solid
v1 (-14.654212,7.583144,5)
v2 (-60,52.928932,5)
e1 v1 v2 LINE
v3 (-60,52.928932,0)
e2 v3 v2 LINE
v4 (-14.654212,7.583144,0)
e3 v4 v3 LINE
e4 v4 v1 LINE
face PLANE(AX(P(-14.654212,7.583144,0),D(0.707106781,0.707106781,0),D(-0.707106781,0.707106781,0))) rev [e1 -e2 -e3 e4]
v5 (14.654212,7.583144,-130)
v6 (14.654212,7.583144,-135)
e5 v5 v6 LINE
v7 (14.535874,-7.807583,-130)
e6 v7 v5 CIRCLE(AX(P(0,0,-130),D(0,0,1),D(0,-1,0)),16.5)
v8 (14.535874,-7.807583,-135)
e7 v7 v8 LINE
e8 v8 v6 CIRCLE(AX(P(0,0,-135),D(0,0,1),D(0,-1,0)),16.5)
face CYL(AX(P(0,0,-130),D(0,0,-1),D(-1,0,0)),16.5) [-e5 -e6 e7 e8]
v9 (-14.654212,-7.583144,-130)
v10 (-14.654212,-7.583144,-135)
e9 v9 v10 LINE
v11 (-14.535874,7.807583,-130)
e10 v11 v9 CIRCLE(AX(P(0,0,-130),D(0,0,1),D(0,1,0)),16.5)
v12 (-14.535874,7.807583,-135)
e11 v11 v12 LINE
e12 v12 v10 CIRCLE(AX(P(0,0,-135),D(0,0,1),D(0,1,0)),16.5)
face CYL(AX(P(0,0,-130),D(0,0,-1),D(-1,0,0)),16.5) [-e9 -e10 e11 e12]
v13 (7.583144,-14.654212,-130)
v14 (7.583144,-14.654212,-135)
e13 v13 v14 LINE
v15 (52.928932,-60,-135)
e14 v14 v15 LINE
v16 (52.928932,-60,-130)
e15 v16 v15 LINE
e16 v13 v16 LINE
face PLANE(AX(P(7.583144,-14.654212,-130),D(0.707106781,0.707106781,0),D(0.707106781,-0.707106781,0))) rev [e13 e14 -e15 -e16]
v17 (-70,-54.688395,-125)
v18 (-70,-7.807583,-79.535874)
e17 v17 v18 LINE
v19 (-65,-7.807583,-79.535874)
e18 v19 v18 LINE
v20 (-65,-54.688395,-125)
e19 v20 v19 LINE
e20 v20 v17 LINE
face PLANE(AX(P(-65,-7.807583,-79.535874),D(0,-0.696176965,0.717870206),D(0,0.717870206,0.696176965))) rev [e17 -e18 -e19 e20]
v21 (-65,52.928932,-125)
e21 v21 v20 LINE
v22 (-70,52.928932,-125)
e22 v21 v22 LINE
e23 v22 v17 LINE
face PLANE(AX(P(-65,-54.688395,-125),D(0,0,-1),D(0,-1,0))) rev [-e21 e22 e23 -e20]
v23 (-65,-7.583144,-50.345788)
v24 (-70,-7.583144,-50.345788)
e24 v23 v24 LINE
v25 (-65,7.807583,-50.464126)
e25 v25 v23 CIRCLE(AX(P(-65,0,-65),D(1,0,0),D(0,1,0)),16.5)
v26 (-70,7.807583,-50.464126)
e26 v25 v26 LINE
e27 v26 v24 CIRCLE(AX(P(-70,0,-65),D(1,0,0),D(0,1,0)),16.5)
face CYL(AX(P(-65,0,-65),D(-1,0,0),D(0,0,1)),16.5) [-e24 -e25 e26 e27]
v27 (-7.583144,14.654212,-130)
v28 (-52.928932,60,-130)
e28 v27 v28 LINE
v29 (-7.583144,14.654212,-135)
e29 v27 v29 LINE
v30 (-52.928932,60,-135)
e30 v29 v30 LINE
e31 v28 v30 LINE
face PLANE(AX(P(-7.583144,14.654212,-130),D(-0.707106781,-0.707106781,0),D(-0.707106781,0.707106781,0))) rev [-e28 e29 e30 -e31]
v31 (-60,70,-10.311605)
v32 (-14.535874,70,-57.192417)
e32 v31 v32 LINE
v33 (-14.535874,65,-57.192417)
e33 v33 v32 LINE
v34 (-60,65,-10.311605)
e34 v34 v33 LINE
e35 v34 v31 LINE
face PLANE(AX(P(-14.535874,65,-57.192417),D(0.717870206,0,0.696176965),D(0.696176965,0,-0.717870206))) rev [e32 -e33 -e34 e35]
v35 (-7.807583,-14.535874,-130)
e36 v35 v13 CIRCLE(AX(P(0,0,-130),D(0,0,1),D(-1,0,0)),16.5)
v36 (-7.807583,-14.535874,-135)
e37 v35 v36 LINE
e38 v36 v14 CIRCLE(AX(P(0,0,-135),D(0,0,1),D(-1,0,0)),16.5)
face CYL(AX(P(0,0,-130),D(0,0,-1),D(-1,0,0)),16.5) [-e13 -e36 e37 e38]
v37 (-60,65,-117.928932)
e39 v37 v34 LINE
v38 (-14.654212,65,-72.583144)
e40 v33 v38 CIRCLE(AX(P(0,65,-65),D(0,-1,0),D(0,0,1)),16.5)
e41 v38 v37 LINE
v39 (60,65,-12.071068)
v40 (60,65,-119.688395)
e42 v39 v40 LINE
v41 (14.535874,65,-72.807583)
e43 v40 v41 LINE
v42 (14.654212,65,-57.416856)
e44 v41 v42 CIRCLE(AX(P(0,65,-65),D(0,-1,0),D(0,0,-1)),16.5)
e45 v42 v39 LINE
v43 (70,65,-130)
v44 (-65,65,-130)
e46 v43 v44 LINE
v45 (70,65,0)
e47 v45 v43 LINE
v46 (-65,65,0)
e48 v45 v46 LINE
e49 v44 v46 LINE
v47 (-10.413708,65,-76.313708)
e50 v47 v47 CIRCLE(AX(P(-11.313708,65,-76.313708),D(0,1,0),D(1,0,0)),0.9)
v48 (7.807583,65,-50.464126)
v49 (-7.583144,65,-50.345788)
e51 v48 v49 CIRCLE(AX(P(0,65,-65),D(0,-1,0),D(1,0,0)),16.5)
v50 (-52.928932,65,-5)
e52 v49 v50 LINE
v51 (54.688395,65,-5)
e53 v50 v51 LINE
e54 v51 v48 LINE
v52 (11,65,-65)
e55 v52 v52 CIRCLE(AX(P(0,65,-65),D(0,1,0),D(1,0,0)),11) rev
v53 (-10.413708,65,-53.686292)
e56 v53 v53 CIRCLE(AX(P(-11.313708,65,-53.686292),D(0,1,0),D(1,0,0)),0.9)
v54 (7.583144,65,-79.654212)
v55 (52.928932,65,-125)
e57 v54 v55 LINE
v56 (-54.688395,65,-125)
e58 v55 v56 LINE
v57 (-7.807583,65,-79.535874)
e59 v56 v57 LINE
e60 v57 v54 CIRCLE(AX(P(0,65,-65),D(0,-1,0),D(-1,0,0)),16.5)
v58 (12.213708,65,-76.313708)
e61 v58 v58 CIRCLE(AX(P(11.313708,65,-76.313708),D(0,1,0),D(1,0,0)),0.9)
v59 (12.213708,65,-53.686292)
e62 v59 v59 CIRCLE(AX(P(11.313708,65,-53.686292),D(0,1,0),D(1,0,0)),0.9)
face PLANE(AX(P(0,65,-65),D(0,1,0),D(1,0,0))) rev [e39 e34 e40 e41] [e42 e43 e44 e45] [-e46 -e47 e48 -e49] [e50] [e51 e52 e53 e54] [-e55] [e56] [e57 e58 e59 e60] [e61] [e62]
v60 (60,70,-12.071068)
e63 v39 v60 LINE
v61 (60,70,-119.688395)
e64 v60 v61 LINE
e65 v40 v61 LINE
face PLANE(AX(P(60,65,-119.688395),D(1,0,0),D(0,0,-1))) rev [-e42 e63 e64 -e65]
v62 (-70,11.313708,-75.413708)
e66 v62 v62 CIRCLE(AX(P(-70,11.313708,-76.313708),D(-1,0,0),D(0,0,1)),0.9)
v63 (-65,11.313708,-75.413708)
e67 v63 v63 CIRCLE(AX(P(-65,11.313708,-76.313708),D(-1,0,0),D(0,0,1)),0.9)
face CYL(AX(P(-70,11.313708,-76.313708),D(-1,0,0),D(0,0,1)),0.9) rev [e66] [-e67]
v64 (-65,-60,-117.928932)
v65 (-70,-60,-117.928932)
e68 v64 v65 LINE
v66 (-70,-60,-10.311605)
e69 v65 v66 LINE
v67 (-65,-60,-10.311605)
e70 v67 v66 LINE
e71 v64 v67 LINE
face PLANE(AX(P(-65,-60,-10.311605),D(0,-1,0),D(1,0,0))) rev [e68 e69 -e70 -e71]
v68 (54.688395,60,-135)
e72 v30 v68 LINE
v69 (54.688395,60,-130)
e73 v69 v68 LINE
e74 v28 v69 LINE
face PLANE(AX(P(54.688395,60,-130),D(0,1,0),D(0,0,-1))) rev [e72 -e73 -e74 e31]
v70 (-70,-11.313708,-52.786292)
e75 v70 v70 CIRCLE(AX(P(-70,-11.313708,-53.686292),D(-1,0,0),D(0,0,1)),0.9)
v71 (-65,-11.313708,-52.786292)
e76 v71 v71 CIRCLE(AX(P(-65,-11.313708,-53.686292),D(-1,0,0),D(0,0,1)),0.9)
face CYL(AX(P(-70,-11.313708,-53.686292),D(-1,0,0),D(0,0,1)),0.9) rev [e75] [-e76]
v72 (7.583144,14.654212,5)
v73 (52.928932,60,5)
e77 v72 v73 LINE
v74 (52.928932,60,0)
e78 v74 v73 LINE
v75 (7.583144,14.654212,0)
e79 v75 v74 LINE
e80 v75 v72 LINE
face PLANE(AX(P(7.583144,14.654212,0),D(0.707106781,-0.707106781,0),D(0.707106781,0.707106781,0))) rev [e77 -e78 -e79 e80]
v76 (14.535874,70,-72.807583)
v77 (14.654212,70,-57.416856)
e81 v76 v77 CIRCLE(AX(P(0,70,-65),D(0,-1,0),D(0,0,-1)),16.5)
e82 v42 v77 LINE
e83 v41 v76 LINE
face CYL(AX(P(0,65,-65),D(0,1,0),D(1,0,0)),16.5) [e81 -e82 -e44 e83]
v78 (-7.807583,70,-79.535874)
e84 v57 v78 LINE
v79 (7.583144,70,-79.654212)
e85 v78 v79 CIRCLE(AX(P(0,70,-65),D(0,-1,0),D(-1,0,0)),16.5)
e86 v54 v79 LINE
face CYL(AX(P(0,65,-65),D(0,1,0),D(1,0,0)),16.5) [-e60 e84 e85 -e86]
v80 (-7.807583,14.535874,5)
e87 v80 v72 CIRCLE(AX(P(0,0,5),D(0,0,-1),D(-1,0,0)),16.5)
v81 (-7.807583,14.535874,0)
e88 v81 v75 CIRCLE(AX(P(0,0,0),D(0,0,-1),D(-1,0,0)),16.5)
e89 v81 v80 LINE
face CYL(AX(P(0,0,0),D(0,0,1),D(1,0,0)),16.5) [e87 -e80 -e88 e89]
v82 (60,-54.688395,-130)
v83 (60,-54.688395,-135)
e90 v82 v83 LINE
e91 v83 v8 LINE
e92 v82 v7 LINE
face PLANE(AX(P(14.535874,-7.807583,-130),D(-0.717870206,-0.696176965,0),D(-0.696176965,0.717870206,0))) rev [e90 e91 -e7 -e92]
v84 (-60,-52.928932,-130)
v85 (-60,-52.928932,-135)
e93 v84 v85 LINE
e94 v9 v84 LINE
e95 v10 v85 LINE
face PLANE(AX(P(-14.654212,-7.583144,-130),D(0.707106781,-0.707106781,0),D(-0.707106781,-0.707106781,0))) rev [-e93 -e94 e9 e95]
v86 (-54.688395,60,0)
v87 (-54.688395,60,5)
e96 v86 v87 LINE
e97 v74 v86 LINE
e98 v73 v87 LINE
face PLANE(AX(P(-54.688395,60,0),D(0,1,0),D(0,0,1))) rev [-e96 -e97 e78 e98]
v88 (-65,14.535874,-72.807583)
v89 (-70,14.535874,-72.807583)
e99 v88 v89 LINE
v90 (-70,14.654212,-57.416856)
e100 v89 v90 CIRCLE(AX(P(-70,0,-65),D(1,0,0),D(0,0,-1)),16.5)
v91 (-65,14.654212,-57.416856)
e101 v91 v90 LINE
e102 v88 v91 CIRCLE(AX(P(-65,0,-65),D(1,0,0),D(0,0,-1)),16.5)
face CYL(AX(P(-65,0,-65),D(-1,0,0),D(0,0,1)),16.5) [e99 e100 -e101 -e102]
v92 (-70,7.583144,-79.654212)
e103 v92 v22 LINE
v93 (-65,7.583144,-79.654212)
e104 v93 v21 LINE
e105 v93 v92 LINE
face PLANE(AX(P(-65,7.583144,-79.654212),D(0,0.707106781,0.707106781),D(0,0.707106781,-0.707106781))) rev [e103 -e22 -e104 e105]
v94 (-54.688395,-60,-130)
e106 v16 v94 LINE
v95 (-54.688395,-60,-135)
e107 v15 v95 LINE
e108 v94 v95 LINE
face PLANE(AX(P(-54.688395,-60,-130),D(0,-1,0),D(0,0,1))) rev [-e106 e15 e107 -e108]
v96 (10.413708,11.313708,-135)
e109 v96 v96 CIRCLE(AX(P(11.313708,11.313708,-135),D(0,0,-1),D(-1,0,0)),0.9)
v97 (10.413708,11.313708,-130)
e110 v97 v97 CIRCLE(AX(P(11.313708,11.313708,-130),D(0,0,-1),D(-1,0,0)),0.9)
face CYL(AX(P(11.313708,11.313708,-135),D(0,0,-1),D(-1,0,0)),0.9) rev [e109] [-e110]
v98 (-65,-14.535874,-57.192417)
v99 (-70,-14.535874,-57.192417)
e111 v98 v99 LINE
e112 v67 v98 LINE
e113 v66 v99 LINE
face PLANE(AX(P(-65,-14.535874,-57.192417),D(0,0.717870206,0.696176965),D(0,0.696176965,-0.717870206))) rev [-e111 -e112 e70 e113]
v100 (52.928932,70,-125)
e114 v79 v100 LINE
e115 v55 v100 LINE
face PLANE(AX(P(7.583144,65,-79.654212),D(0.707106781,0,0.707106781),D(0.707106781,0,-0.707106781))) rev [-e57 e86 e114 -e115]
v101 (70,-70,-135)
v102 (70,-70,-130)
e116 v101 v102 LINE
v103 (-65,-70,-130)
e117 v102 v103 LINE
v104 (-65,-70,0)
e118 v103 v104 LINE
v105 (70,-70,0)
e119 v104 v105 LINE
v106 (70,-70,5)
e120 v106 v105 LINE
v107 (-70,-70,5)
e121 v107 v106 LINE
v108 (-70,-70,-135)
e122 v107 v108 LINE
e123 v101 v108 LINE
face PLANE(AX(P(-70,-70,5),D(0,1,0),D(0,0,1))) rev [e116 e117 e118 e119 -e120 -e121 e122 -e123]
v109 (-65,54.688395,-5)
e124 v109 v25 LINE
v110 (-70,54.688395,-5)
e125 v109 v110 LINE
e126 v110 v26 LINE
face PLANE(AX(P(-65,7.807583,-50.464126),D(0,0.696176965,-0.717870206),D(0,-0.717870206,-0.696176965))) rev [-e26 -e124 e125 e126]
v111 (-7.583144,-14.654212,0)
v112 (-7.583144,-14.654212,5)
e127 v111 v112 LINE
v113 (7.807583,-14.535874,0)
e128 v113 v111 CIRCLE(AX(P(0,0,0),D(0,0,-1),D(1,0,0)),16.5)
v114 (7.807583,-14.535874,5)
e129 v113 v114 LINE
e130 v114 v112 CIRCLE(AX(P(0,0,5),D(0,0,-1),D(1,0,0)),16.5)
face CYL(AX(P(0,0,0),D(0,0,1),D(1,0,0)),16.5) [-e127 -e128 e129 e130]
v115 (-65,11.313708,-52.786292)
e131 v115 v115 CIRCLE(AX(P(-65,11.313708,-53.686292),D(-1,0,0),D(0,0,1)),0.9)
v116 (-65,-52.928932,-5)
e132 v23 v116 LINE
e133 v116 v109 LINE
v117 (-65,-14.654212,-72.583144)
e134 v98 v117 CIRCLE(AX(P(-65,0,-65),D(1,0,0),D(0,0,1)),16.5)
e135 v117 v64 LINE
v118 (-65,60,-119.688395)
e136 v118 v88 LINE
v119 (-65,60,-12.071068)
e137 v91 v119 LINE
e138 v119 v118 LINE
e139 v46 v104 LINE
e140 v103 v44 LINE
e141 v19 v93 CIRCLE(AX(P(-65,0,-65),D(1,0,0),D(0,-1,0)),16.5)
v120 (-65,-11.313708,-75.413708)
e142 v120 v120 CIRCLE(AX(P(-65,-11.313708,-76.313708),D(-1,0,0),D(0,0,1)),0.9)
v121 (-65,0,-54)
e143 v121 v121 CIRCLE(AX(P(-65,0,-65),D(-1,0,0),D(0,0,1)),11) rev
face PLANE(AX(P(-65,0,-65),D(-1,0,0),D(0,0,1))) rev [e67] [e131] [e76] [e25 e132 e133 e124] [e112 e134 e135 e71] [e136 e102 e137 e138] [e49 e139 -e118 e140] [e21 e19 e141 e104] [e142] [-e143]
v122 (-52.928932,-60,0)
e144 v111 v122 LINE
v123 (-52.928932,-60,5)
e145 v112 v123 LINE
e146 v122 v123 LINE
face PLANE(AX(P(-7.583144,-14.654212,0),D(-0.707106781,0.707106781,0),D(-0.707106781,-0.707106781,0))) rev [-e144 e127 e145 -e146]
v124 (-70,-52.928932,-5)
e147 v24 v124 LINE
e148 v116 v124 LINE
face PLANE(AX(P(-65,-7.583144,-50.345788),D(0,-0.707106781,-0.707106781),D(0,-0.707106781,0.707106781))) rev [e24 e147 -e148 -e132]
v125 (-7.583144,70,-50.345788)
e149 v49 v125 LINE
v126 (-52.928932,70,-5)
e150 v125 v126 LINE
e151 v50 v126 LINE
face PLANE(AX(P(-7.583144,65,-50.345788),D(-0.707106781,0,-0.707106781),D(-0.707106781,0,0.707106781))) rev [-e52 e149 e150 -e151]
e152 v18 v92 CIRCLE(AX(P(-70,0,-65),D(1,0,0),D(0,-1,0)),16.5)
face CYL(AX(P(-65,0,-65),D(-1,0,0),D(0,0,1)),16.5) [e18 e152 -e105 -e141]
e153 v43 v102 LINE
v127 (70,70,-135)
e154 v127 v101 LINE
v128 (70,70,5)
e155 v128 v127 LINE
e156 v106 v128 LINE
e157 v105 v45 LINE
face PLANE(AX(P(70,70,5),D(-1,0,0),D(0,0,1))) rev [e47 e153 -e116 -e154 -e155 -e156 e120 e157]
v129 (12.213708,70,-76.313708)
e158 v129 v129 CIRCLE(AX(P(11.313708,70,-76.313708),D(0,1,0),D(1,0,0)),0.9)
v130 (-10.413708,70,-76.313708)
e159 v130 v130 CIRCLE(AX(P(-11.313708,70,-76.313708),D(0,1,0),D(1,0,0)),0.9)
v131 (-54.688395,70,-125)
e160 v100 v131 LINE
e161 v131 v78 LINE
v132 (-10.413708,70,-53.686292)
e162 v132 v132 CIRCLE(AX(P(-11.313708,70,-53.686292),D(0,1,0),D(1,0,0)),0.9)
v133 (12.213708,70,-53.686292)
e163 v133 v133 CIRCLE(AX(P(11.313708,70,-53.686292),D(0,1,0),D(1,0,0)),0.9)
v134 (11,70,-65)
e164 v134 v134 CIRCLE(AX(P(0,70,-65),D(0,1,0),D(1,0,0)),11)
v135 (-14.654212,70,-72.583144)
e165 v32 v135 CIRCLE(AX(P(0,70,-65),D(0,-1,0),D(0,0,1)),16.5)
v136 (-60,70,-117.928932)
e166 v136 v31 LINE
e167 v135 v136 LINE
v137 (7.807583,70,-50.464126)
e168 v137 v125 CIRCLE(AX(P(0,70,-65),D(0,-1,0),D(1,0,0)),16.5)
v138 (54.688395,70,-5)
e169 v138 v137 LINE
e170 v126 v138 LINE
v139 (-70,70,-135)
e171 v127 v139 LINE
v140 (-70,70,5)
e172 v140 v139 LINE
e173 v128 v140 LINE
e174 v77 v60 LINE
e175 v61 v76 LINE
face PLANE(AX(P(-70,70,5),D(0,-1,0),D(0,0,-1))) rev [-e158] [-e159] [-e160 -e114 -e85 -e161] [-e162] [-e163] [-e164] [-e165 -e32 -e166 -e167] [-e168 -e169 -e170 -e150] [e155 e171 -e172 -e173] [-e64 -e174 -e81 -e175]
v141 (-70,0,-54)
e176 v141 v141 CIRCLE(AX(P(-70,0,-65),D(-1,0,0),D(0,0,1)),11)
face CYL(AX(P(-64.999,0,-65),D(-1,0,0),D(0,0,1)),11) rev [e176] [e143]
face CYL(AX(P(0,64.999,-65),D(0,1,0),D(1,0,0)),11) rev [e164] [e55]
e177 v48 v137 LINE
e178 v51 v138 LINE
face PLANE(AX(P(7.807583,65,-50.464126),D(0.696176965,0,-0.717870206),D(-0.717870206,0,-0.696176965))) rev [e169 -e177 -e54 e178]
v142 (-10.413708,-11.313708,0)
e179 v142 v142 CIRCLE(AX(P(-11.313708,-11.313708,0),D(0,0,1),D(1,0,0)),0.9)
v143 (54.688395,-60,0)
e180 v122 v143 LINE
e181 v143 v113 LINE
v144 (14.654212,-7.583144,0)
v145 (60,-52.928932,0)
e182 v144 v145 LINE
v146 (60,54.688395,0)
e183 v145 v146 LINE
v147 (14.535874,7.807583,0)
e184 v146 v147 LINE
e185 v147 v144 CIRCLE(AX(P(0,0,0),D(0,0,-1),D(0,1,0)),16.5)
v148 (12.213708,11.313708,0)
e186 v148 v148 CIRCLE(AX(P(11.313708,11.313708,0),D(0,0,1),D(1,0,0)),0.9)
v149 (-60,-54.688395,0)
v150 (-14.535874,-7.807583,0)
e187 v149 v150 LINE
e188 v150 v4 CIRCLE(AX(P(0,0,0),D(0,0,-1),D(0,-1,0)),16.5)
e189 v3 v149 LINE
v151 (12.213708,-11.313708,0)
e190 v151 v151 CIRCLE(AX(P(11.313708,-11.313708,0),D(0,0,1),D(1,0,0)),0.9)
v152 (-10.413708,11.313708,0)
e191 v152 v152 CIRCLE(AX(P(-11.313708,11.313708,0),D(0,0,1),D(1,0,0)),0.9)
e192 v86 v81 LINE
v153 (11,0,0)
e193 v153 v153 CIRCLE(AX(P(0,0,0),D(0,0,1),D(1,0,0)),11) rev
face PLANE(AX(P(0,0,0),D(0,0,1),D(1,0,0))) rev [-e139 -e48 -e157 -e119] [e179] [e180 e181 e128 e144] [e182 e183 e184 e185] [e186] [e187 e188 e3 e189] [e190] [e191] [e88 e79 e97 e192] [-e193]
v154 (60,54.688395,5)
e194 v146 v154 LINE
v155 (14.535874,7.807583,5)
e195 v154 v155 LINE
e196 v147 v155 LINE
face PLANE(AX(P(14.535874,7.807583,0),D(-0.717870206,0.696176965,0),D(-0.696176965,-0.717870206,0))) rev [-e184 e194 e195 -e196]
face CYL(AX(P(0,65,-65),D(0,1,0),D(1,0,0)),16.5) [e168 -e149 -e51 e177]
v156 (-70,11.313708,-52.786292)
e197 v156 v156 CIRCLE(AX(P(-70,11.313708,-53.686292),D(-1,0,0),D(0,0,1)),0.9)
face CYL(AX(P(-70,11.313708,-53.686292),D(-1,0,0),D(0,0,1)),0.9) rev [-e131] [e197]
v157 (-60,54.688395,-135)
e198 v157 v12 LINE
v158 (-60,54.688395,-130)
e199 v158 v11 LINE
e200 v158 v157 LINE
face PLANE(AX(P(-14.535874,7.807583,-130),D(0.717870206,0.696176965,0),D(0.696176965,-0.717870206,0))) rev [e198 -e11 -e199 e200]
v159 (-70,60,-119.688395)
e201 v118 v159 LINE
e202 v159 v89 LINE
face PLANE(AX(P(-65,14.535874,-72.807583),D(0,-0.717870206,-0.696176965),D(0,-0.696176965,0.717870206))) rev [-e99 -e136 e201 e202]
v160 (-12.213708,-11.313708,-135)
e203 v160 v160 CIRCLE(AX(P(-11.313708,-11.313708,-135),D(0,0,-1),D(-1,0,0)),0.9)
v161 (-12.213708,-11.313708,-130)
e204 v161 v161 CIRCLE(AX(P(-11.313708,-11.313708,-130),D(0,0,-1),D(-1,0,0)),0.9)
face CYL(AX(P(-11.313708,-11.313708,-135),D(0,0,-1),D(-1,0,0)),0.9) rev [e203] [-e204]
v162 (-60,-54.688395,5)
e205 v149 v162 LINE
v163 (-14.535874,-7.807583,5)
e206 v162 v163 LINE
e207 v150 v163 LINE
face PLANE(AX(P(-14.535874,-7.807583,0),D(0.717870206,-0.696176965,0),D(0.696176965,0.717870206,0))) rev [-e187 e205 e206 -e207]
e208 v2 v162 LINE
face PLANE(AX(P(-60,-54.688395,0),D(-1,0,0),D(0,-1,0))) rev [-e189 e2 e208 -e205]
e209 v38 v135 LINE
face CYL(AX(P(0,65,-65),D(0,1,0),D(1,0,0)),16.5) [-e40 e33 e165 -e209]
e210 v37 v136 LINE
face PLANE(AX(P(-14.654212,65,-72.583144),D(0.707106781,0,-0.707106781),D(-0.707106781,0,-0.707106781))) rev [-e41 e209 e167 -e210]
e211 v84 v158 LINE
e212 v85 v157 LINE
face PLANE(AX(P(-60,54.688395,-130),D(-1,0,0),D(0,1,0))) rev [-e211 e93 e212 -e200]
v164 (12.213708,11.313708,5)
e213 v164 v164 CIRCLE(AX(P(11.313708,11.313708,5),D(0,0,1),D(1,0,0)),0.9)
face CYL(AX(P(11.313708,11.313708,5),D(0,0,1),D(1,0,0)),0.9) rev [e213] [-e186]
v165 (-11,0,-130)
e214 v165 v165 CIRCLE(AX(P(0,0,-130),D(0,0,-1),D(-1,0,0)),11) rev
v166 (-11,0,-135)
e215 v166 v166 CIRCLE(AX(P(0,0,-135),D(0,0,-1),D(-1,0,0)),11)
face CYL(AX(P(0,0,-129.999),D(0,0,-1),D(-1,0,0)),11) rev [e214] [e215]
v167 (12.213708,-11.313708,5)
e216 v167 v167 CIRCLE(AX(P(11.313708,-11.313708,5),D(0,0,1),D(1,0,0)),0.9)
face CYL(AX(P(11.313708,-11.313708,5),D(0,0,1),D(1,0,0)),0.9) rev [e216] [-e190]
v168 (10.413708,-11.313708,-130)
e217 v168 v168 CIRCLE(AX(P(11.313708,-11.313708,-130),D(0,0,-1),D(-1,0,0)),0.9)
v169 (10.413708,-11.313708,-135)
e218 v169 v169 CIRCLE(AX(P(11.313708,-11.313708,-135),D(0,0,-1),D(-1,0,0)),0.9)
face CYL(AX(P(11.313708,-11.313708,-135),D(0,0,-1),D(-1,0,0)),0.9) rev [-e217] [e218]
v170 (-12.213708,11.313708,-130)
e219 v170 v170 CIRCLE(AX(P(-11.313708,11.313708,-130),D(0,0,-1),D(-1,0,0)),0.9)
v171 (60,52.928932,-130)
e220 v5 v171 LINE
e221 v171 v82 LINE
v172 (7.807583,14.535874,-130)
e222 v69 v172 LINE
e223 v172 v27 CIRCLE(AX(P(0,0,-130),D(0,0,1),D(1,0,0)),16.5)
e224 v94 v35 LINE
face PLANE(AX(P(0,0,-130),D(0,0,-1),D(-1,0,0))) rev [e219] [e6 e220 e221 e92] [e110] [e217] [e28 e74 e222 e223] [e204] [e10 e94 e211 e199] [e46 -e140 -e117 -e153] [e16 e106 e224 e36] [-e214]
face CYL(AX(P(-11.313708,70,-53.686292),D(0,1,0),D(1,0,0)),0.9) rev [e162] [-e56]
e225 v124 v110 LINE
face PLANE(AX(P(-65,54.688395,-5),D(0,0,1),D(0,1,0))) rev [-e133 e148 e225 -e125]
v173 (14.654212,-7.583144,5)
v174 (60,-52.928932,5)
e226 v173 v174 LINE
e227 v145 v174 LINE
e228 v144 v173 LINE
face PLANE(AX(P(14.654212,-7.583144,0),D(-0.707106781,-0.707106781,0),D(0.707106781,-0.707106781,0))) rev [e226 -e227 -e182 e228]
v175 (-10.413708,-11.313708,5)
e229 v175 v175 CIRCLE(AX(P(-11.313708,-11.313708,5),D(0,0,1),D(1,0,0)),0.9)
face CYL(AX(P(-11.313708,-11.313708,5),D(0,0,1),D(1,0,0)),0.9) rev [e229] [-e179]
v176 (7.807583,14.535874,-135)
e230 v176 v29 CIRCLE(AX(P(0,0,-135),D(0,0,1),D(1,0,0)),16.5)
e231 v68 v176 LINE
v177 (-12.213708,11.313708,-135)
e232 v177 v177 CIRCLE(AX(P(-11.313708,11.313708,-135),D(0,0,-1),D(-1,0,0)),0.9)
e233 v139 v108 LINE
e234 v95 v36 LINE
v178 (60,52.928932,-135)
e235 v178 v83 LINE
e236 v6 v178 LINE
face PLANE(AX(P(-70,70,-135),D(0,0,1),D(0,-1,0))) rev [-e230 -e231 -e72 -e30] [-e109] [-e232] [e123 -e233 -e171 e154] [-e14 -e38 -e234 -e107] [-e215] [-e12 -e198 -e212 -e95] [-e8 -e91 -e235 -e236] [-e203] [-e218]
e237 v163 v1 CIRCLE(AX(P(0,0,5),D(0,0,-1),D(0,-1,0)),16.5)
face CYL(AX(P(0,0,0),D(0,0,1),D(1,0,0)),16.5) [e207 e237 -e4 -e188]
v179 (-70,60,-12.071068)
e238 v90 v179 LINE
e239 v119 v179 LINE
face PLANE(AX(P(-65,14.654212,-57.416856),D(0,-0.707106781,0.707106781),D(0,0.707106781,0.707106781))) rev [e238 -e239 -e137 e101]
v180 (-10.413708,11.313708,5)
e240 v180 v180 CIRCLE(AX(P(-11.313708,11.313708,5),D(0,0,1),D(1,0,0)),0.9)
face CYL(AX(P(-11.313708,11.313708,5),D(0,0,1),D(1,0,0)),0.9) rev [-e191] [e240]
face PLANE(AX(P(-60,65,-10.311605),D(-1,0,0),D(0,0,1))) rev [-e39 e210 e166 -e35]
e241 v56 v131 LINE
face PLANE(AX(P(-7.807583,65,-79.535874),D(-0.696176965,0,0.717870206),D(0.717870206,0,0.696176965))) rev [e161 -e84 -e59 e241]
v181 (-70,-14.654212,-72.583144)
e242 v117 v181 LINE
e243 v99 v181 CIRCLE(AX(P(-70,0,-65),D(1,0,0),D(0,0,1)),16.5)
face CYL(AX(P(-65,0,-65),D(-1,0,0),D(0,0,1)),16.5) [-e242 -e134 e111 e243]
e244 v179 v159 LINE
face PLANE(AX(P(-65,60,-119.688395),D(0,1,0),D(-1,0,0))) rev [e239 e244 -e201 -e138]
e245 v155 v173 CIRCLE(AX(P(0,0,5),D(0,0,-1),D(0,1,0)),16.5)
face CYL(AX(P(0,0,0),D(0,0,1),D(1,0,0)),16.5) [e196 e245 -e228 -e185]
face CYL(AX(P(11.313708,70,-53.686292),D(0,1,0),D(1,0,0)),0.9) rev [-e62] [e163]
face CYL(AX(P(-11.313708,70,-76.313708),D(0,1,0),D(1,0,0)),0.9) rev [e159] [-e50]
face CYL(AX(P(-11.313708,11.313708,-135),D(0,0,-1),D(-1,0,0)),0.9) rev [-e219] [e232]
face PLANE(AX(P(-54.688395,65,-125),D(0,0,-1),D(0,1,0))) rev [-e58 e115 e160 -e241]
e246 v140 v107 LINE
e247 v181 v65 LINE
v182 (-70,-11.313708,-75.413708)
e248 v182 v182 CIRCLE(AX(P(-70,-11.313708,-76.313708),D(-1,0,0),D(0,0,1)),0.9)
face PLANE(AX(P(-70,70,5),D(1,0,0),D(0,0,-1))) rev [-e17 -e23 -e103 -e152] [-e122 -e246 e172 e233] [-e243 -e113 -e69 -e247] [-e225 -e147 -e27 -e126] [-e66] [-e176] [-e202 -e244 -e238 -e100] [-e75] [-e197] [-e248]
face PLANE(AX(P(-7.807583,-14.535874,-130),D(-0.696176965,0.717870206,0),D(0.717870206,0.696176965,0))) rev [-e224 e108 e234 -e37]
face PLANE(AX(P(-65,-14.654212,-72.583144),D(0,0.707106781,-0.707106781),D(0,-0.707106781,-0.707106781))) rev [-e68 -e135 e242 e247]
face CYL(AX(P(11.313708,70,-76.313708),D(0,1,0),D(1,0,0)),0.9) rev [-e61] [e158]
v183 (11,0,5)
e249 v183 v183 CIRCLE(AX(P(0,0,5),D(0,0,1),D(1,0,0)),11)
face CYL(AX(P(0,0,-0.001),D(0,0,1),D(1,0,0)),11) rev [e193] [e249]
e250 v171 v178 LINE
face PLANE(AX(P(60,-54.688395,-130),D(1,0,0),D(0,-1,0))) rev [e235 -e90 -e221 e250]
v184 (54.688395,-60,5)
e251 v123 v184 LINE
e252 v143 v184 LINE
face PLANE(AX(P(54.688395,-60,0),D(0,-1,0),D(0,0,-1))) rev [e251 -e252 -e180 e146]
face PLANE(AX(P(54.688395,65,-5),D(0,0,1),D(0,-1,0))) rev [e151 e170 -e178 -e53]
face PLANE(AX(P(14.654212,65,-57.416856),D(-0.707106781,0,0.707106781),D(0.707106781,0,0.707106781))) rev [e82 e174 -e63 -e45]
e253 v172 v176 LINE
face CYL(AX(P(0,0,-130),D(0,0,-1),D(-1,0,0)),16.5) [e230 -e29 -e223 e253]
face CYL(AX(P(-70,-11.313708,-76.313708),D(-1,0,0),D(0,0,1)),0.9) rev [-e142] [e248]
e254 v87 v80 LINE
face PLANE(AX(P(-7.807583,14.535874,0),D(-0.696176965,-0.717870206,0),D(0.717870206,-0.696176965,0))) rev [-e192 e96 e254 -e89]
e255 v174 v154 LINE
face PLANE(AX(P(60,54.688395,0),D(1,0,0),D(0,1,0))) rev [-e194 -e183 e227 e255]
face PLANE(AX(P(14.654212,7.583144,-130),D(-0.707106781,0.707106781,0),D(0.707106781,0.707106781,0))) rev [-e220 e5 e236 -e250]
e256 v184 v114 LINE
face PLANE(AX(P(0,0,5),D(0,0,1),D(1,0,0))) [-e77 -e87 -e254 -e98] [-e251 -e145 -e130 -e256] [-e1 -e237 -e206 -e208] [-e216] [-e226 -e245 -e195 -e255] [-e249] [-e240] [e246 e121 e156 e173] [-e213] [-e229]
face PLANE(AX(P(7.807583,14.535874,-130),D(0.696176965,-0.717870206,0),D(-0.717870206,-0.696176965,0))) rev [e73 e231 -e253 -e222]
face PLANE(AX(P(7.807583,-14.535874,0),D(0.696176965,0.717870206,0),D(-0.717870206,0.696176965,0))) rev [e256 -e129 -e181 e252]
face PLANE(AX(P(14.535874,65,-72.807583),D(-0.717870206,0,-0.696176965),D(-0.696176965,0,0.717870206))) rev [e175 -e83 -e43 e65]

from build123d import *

# Parameters (mm, degrees)
SKETCH3_W                 = 140
SKETCH3_H                 = 140
BOSS_EXTRUDE1_DEPTH       = 5
CUT_EXTRUDE1_DEPTH        = 5
CIRPATTERN1_COUNT         = 4
CUT_EXTRUDE2_REACH        = 101.121
SKETCH7_R                 = 11
CIRPATTERN2_COUNT         = 4
CIRPATTERN3_START         = -70
CIRPATTERN3_OUTLINE_W     = 140
CIRPATTERN3_OUTLINE_H     = 140
CIRPATTERN3_OUTLINE_R     = 0.9
CIRPATTERN3_OUTLINE_R_2   = 11
CIRPATTERN3_DEPTH         = 5
CIRPATTERN3_START_2       = -135
CIRPATTERN3_2_OUTLINE_W   = 140
CIRPATTERN3_2_OUTLINE_H   = 140
CIRPATTERN3_2_OUTLINE_R   = 0.9
CIRPATTERN3_2_OUTLINE_R_2 = 11
CIRPATTERN3_2_DEPTH       = 5
CIRPATTERN4_START         = 65
CIRPATTERN4_OUTLINE_W     = 140
CIRPATTERN4_OUTLINE_H     = 140
CIRPATTERN4_OUTLINE_R     = 0.9
CIRPATTERN4_OUTLINE_R_2   = 11
CIRPATTERN4_DEPTH         = 5


# Read off the part's stored shape, not the designer's step: CirPattern3, CirPattern4
with BuildPart() as part:
    # Sketch3 → Boss-Extrude1 (new body)
    with BuildSketch(Plane.XY):
        Rectangle(SKETCH3_W, SKETCH3_H)
    extrude(amount=BOSS_EXTRUDE1_DEPTH)

    # Sketch4 → Cut-Extrude1 (cut)
    with BuildSketch(Plane.XY.offset(5)):
        with BuildLine():
            Line((7.583144073, 14.654211885), (52.928932188, 60))
            Line((52.928932188, 60), (-54.688394727, 60))
            Line((-54.688394727, 60), (-7.80758307, 14.53587447))
            ThreePointArc((-7.80758307, 14.53587447), (-0.126862728, 16.499512291), (7.583144073, 14.654211885))
        make_face()
    cut_extrude1 = extrude(amount=-CUT_EXTRUDE1_DEPTH, mode=Mode.SUBTRACT)

    # CirPattern1: Cut-Extrude1 ×4 about axis
    cirpattern1_axis = Axis((0, 0, 0), (0, 0, 1))
    for i in range(1, CIRPATTERN1_COUNT):
        add(cut_extrude1.rotate(cirpattern1_axis, i * 360 / CIRPATTERN1_COUNT), mode=Mode.SUBTRACT)

    # Sketch7 → Cut-Extrude2 (cut, up to next)
    with BuildSketch(Plane.XY.offset(5), mode=Mode.PRIVATE) as cut_extrude2_sk1:
        Circle(SKETCH7_R)
    cut_extrude2_tool1 = extrude(cut_extrude2_sk1.sketch, amount=-CUT_EXTRUDE2_REACH, mode=Mode.PRIVATE) & part.part
    add(cut_extrude2_tool1.solids().sort_by_distance((0, 0, 5))[0], mode=Mode.SUBTRACT)

    # Sketch9 → Ø1.8 (1.8) Diameter Hole1 (revolve, cut)
    with BuildSketch(Plane(origin=(11.313708499, -11.313708499, 5), x_dir=(0, -1, 0), z_dir=(1, 0, 0))):
        Polygon((0, 0), (0, 6.540774557), (0.9, 6), (0.9, 0), align=None)
    f_1_8_1_8_diameter_hole1 = revolve(axis=Axis((11.313708499, -11.313708499, 11.35), (0, 0, -1)), mode=Mode.SUBTRACT)

    # CirPattern2: Ø1.8 (1.8) Diameter Hole1 ×4 about axis
    cirpattern2_axis = Axis((0, 0, 0), (0, 0, 1))
    for i in range(1, CIRPATTERN2_COUNT):
        add(f_1_8_1_8_diameter_hole1.rotate(cirpattern2_axis, i * 360 / CIRPATTERN2_COUNT), mode=Mode.SUBTRACT)


with BuildPart() as body_2:
    # CirPattern3 outline → CirPattern3 (new body)
    with BuildSketch(Plane.YZ.offset(CIRPATTERN3_START)):
        with Locations((0, -65)):
            Rectangle(CIRPATTERN3_OUTLINE_W, CIRPATTERN3_OUTLINE_H)
        with BuildLine():
            ThreePointArc((-7.80758307, -79.53587447), (-0.126862728, -81.499512291), (7.583144073, -79.654211885))
            Line((7.583144073, -79.654211885), (52.928932188, -125))
            Line((52.928932188, -125), (-54.688394727, -125))
            Line((-54.688394727, -125), (-7.80758307, -79.53587447))
        make_face(mode=Mode.SUBTRACT)
        with Locations((-11.313708499, -76.313708499)):
            Circle(CIRPATTERN3_OUTLINE_R, mode=Mode.SUBTRACT)
        with Locations((11.313708499, -76.313708499)):
            Circle(CIRPATTERN3_OUTLINE_R, mode=Mode.SUBTRACT)
        with BuildLine():
            Line((60, -12.071067812), (60, -119.688394727))
            Line((60, -119.688394727), (14.53587447, -72.80758307))
            ThreePointArc((14.53587447, -72.80758307), (16.499512291, -65.126862728), (14.654211885, -57.416855927))
            Line((14.654211885, -57.416855927), (60, -12.071067812))
        make_face(mode=Mode.SUBTRACT)
        with BuildLine():
            ThreePointArc((-14.53587447, -57.19241693), (-16.499512291, -64.873137272), (-14.654211885, -72.583144073))
            Line((-14.654211885, -72.583144073), (-60, -117.928932188))
            Line((-60, -117.928932188), (-60, -10.311605273))
            Line((-60, -10.311605273), (-14.53587447, -57.19241693))
        make_face(mode=Mode.SUBTRACT)
        with Locations((-11.313708499, -53.686291501)):
            Circle(CIRPATTERN3_OUTLINE_R, mode=Mode.SUBTRACT)
        with Locations((0, -65)):
            Circle(CIRPATTERN3_OUTLINE_R_2, mode=Mode.SUBTRACT)
        with Locations((11.313708499, -53.686291501)):
            Circle(CIRPATTERN3_OUTLINE_R, mode=Mode.SUBTRACT)
        with BuildLine():
            ThreePointArc((7.80758307, -50.46412553), (0.126862728, -48.500487709), (-7.583144073, -50.345788115))
            Line((-7.583144073, -50.345788115), (-52.928932188, -5))
            Line((-52.928932188, -5), (54.688394727, -5))
            Line((54.688394727, -5), (7.80758307, -50.46412553))
        make_face(mode=Mode.SUBTRACT)
    extrude(amount=CIRPATTERN3_DEPTH)


with BuildPart() as body_3:
    # CirPattern3 2 outline → CirPattern3 2 (new body)
    with BuildSketch(Plane.XY.offset(CIRPATTERN3_START_2)):
        Rectangle(CIRPATTERN3_2_OUTLINE_W, CIRPATTERN3_2_OUTLINE_H)
        with BuildLine():
            Line((52.928932188, -60), (-54.688394727, -60))
            Line((-54.688394727, -60), (-7.80758307, -14.53587447))
            ThreePointArc((-7.80758307, -14.53587447), (-0.126862728, -16.499512291), (7.583144073, -14.654211885))
            Line((7.583144073, -14.654211885), (52.928932188, -60))
        make_face(mode=Mode.SUBTRACT)
        with Locations((-11.313708499, -11.313708499)):
            Circle(CIRPATTERN3_2_OUTLINE_R, mode=Mode.SUBTRACT)
        with Locations((11.313708499, -11.313708499)):
            Circle(CIRPATTERN3_2_OUTLINE_R, mode=Mode.SUBTRACT)
        with BuildLine():
            ThreePointArc((14.53587447, -7.80758307), (16.499512291, -0.126862728), (14.654211885, 7.583144073))
            Line((14.654211885, 7.583144073), (60, 52.928932188))
            Line((60, 52.928932188), (60, -54.688394727))
            Line((60, -54.688394727), (14.53587447, -7.80758307))
        make_face(mode=Mode.SUBTRACT)
        with BuildLine():
            ThreePointArc((-14.53587447, 7.80758307), (-16.499512291, 0.126862728), (-14.654211885, -7.583144073))
            Line((-14.654211885, -7.583144073), (-60, -52.928932188))
            Line((-60, -52.928932188), (-60, 54.688394727))
            Line((-60, 54.688394727), (-14.53587447, 7.80758307))
        make_face(mode=Mode.SUBTRACT)
        with Locations((-11.313708499, 11.313708499)):
            Circle(CIRPATTERN3_2_OUTLINE_R, mode=Mode.SUBTRACT)
        Circle(CIRPATTERN3_2_OUTLINE_R_2, mode=Mode.SUBTRACT)
        with Locations((11.313708499, 11.313708499)):
            Circle(CIRPATTERN3_2_OUTLINE_R, mode=Mode.SUBTRACT)
        with BuildLine():
            Line((-52.928932188, 60), (54.688394727, 60))
            Line((54.688394727, 60), (7.80758307, 14.53587447))
            ThreePointArc((7.80758307, 14.53587447), (0.126862728, 16.499512291), (-7.583144073, 14.654211885))
            Line((-7.583144073, 14.654211885), (-52.928932188, 60))
        make_face(mode=Mode.SUBTRACT)
    extrude(amount=CIRPATTERN3_2_DEPTH)


with BuildPart() as body_4:
    # CirPattern4 outline → CirPattern4 (new body)
    with BuildSketch(Plane(origin=(0, 0, 0), x_dir=(1, 0, 0), z_dir=(0, 1, 0)).offset(CIRPATTERN4_START)):
        with Locations((0, 65)):
            Rectangle(CIRPATTERN4_OUTLINE_W, CIRPATTERN4_OUTLINE_H)
        with BuildLine():
            Line((-60, 10.311605273), (-60, 117.928932188))
            Line((-60, 117.928932188), (-14.654211885, 72.583144073))
            ThreePointArc((-14.654211885, 72.583144073), (-16.499512291, 64.873137272), (-14.53587447, 57.19241693))
            Line((-14.53587447, 57.19241693), (-60, 10.311605273))
        make_face(mode=Mode.SUBTRACT)
        with Locations((-11.313708499, 53.686291501)):
            Circle(CIRPATTERN4_OUTLINE_R, mode=Mode.SUBTRACT)
        with BuildLine():
            Line((54.688394727, 5), (-52.928932188, 5))
            Line((-52.928932188, 5), (-7.583144073, 50.345788115))
            ThreePointArc((-7.583144073, 50.345788115), (0.126862728, 48.500487709), (7.80758307, 50.46412553))
            Line((7.80758307, 50.46412553), (54.688394727, 5))
        make_face(mode=Mode.SUBTRACT)
        with Locations((11.313708499, 53.686291501)):
            Circle(CIRPATTERN4_OUTLINE_R, mode=Mode.SUBTRACT)
        with Locations((-11.313708499, 76.313708499)):
            Circle(CIRPATTERN4_OUTLINE_R, mode=Mode.SUBTRACT)
        with BuildLine():
            Line((-54.688394727, 125), (52.928932188, 125))
            Line((52.928932188, 125), (7.583144073, 79.654211885))
            ThreePointArc((7.583144073, 79.654211885), (-0.126862728, 81.499512291), (-7.80758307, 79.53587447))
            Line((-7.80758307, 79.53587447), (-54.688394727, 125))
        make_face(mode=Mode.SUBTRACT)
        with Locations((0, 65)):
            Circle(CIRPATTERN4_OUTLINE_R_2, mode=Mode.SUBTRACT)
        with Locations((11.313708499, 76.313708499)):
            Circle(CIRPATTERN4_OUTLINE_R, mode=Mode.SUBTRACT)
        with BuildLine():
            Line((60, 119.688394727), (60, 12.071067812))
            Line((60, 12.071067812), (14.654211885, 57.416855927))
            ThreePointArc((14.654211885, 57.416855927), (16.499512291, 65.126862728), (14.53587447, 72.80758307))
            Line((14.53587447, 72.80758307), (60, 119.688394727))
        make_face(mode=Mode.SUBTRACT)
    extrude(amount=CIRPATTERN4_DEPTH)


with BuildPart() as part_1:
    add(part.part)

    # Combine1: union body 4, body 3, body 2
    add(body_4.part)
    add(body_3.part)
    add(body_2.part)


solid = part_1.part
